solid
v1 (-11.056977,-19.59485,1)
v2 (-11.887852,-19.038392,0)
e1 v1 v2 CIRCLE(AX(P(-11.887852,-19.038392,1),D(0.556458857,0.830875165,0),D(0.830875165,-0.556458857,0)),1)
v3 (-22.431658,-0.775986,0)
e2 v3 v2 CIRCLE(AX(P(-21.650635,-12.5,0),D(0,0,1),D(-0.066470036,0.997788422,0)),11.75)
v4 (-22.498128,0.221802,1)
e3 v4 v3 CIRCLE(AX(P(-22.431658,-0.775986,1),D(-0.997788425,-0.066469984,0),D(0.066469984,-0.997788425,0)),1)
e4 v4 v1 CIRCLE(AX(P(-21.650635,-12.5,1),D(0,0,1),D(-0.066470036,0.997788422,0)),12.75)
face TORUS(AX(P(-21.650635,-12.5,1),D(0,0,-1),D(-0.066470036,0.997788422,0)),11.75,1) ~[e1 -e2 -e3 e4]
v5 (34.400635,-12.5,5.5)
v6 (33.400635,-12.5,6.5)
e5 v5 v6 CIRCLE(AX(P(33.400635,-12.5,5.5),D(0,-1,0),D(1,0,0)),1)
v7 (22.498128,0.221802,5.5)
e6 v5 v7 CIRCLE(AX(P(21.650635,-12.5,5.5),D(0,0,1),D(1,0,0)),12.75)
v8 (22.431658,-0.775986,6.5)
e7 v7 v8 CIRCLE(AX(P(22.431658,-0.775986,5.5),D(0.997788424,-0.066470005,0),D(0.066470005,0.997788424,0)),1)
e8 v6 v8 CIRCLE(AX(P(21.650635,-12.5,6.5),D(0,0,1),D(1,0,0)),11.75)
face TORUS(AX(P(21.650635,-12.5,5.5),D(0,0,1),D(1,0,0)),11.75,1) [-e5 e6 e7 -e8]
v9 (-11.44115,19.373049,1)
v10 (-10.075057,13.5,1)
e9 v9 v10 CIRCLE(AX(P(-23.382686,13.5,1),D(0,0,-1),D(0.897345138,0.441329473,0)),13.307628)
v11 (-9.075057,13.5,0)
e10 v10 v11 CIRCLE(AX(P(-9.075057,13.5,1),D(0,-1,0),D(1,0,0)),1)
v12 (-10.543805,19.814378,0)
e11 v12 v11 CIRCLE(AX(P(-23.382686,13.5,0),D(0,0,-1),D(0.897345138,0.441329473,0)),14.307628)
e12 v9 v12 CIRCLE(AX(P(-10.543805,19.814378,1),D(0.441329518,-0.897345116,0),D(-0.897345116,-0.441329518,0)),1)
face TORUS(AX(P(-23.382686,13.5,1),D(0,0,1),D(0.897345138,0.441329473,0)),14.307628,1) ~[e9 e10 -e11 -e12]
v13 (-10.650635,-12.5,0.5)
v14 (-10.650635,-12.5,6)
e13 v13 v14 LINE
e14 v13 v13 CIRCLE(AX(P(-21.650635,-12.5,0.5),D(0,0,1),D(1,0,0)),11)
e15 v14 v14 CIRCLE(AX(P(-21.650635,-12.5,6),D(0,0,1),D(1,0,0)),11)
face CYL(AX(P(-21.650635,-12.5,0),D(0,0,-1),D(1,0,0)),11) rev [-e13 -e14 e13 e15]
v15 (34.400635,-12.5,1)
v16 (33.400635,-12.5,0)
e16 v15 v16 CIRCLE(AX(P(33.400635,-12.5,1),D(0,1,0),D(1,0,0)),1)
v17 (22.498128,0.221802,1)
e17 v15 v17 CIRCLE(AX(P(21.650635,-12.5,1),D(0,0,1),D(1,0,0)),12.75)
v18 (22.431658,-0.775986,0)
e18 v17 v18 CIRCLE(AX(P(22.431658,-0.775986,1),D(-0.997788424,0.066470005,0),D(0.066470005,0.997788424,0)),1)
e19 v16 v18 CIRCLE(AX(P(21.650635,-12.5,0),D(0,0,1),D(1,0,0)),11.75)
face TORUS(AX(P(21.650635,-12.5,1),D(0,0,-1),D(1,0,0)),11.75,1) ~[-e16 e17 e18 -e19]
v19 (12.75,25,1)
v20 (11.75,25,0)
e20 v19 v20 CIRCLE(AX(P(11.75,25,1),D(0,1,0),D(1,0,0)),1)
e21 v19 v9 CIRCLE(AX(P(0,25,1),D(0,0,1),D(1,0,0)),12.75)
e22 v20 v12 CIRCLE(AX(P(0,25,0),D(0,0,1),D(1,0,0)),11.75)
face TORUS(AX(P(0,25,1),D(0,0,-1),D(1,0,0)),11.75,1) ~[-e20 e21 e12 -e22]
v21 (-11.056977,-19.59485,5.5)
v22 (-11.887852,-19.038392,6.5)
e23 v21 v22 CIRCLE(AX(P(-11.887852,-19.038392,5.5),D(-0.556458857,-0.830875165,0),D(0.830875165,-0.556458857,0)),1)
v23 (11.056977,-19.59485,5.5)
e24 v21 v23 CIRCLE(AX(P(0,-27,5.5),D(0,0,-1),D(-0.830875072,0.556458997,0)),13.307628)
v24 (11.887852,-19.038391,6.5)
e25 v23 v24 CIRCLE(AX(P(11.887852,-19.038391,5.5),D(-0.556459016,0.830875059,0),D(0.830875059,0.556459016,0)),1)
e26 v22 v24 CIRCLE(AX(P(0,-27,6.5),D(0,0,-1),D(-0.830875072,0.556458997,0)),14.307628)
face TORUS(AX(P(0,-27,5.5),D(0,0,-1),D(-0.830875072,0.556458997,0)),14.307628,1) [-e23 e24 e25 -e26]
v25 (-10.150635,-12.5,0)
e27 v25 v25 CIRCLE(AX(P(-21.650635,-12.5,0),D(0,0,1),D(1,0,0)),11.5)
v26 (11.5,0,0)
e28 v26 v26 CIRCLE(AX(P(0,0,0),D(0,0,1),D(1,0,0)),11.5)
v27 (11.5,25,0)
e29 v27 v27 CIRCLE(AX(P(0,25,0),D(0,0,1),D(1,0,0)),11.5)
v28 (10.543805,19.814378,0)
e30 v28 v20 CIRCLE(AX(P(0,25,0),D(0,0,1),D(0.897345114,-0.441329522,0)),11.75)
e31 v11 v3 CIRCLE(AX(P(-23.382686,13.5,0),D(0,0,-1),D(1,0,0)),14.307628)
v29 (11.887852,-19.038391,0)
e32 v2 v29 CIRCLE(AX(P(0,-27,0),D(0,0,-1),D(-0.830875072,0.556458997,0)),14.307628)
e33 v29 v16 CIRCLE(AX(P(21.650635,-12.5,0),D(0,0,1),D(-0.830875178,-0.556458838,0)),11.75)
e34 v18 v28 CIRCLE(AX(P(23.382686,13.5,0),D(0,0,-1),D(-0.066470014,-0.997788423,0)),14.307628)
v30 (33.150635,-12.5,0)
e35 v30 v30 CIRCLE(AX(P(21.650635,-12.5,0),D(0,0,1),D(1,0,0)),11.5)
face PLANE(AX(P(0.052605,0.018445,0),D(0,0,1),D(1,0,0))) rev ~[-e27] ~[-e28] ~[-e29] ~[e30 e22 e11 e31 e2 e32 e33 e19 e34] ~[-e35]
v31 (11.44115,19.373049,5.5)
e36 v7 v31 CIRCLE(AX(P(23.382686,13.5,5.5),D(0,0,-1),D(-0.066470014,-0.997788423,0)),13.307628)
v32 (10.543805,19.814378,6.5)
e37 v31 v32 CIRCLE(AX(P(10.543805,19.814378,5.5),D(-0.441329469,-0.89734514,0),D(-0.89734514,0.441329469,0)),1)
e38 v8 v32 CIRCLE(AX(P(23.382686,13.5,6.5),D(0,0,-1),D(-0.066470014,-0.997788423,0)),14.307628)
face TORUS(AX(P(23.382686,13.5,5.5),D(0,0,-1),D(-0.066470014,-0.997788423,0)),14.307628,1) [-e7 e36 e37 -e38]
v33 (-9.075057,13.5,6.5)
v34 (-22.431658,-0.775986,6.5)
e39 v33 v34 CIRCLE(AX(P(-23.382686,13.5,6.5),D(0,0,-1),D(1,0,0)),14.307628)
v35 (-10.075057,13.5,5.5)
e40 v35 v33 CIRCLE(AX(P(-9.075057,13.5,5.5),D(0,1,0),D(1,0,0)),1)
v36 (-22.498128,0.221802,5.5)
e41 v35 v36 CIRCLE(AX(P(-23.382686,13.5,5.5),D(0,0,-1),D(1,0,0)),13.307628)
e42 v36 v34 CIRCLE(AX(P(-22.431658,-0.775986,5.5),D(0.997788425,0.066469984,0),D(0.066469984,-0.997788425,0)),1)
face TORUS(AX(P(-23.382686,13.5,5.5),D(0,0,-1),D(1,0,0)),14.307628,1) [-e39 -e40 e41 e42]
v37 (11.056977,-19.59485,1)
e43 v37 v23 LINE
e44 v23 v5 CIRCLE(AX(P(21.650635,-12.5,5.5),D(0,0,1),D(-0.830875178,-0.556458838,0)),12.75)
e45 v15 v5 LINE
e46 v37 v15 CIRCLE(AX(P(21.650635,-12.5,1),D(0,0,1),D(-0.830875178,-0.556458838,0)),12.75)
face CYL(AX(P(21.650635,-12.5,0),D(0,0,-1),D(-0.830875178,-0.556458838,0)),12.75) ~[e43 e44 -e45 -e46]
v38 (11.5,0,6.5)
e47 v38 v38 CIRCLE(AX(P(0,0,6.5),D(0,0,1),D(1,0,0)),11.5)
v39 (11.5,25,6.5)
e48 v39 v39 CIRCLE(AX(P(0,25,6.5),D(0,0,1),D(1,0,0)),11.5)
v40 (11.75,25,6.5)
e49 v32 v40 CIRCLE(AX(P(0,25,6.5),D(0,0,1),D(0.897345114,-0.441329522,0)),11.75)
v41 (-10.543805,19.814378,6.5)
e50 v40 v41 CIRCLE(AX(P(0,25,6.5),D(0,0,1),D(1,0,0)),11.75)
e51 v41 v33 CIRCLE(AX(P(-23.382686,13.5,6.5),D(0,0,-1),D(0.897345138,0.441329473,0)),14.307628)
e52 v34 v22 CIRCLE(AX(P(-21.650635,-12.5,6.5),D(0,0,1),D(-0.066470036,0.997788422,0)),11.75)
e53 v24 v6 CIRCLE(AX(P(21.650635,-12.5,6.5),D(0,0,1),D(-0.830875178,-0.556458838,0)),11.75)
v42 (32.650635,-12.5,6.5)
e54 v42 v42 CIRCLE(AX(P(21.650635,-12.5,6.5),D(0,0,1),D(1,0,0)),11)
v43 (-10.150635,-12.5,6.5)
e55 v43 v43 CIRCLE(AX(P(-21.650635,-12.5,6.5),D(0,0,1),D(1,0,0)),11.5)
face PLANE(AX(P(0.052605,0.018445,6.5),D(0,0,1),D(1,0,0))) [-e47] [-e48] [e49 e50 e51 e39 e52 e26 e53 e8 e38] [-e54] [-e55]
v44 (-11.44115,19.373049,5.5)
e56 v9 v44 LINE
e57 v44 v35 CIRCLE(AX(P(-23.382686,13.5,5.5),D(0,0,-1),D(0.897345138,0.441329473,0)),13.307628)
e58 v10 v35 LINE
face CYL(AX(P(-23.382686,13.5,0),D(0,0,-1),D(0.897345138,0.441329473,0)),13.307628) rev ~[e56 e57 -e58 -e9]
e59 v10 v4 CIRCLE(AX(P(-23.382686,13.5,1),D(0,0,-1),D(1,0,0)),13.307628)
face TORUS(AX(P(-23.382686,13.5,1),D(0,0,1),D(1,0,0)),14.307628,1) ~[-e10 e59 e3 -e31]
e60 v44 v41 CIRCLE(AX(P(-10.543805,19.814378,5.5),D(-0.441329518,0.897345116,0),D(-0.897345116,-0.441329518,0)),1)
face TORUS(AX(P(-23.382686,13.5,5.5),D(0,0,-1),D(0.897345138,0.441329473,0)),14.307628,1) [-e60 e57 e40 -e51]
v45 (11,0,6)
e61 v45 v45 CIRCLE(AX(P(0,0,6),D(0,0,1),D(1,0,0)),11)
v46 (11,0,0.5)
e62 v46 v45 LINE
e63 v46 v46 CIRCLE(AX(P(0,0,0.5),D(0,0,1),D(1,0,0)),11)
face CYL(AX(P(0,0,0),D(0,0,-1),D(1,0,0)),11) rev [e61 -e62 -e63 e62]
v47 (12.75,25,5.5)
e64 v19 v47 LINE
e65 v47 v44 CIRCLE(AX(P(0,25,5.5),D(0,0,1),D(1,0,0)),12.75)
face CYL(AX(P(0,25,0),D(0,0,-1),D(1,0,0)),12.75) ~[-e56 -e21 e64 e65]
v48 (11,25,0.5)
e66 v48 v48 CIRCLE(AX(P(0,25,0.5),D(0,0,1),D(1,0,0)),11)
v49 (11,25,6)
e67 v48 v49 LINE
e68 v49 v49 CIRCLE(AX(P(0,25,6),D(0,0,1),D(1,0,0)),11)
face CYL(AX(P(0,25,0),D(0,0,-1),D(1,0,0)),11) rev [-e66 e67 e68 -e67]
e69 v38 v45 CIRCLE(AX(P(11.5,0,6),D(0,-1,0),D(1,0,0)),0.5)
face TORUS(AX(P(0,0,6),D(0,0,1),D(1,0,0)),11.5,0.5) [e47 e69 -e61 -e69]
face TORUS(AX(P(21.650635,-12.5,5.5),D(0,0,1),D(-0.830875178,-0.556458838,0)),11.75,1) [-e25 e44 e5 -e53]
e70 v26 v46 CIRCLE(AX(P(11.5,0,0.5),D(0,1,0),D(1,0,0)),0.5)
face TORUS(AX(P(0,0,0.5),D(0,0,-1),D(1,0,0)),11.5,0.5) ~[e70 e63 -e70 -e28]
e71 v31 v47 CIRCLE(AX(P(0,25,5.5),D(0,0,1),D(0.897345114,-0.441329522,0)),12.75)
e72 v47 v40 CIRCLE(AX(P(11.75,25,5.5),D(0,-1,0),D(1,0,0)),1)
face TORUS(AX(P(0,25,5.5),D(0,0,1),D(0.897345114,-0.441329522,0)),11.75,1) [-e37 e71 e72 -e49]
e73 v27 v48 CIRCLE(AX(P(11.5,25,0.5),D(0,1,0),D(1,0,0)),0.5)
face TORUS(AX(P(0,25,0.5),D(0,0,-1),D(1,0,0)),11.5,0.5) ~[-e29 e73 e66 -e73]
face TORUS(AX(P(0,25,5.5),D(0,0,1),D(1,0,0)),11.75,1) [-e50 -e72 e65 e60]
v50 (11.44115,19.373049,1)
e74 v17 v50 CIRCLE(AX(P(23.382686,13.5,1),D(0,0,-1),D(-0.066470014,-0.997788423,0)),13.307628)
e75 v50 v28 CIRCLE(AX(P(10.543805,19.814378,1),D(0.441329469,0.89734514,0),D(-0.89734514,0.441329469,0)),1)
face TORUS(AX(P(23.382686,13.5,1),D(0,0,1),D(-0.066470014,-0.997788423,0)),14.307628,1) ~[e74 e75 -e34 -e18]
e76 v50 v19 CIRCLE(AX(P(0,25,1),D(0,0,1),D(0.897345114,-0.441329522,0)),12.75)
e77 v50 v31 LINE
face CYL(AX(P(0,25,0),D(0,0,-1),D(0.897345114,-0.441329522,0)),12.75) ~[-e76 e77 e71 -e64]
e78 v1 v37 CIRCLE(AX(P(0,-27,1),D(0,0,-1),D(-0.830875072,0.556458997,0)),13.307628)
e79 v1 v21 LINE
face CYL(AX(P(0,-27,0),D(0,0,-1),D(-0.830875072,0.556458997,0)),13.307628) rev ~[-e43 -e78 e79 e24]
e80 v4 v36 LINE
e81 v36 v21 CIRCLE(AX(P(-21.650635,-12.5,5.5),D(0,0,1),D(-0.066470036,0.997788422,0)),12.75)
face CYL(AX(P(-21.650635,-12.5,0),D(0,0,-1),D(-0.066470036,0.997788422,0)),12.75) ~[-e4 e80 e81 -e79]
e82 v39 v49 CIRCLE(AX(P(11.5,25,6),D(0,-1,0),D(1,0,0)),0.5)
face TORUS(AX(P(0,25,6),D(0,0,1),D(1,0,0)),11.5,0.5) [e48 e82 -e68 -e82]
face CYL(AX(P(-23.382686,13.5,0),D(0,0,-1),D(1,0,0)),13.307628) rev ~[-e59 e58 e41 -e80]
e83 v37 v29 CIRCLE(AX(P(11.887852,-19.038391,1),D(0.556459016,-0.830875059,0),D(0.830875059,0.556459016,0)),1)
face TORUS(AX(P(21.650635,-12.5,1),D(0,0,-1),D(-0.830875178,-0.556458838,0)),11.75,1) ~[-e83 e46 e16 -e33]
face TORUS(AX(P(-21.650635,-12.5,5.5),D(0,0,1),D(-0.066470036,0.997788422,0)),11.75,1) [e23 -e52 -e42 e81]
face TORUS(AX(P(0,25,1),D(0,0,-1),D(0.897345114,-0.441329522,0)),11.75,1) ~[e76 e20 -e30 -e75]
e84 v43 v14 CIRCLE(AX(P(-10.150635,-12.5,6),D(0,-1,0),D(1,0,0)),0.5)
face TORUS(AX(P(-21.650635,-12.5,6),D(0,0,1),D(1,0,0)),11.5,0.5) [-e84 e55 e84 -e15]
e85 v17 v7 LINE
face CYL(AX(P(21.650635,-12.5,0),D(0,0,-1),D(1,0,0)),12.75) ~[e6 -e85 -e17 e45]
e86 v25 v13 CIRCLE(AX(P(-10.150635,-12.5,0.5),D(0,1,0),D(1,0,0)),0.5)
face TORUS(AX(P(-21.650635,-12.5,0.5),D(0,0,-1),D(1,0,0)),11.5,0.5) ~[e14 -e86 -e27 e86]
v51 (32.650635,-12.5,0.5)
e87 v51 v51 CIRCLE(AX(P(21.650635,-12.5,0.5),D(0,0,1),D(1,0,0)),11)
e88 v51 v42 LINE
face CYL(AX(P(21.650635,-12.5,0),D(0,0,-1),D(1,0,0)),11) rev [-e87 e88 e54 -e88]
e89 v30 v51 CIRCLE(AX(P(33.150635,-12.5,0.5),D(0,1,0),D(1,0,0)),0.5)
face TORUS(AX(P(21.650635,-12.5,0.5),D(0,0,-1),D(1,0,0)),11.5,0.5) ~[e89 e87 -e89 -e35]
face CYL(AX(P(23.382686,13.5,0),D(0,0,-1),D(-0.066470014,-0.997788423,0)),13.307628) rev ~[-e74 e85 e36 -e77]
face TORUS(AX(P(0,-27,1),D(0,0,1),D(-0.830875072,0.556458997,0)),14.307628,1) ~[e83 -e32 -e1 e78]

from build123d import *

# Parameters (mm, degrees)
F0_R     = 11
F1_DEPTH = 6.5
F2_R     = 1
F3_R     = 0.5


with BuildPart() as f1:
    # F0 (on Top) → F1 (new body)
    with BuildSketch(Plane.XY):
        with BuildLine():
            ThreePointArc((12.0815519999, -4.0741381018), (12.5817782527, -2.0643052101), (12.75, 0))
            ThreePointArc((12.75, 0), (9.8639869866, 8.0786298794), (2.5124689053, 12.5))
            ThreePointArc((2.5124689053, 12.5), (0, 12.25), (-2.5124689053, 12.5))
            ThreePointArc((-2.5124689053, 12.5), (-11.0418238983, 6.375), (-12.0815519999, -4.0741381018))
            ThreePointArc((-12.0815519999, -4.0741381018), (-10.6088111964, -6.125), (-9.5690830947, -8.4258618982))
            ThreePointArc((-9.5690830947, -8.4258618982), (0, -12.75), (9.5690830947, -8.4258618982))
            ThreePointArc((9.5690830947, -8.4258618982), (10.6088111964, -6.125), (12.0815519999, -4.0741381018))
        make_face()
        Circle(F0_R, mode=Mode.SUBTRACT)
        with BuildLine():
            ThreePointArc((2.5124689053, 12.5), (9.8639869866, 8.0786298794), (12.75, 0))
            ThreePointArc((12.75, 0), (12.5817782527, -2.0643052101), (12.0815519999, -4.0741381018))
            ThreePointArc((12.0815519999, -4.0741381018), (16.7895332065, -0.7130500793), (22.4981276547, 0.2218024022))
            ThreePointArc((22.4981276547, 0.2218024022), (11.8579416889, 6.8461856384), (11.4411501987, 19.3730485936))
            ThreePointArc((11.4411501987, 19.3730485936), (7.7772469915, 14.896687215), (2.5124689053, 12.5))
        make_face()
        with BuildLine():
            ThreePointArc((-2.5124689053, 12.5), (0, 12.25), (2.5124689053, 12.5))
            ThreePointArc((2.5124689053, 12.5), (0, 12.75), (-2.5124689053, 12.5))
        make_face()
        with BuildLine():
            ThreePointArc((-2.5124689053, 12.5), (0, 12.75), (2.5124689053, 12.5))
            ThreePointArc((2.5124689053, 12.5), (7.7772469915, 14.896687215), (11.4411501987, 19.3730485936))
            ThreePointArc((11.4411501987, 19.3730485936), (12.4184774637, 22.1114160073), (12.75, 25))
            ThreePointArc((12.75, 25), (-2.8885839653, 37.4184774701), (-11.4411502236, 19.3730486441))
            ThreePointArc((-11.4411502236, 19.3730486441), (-7.7772470139, 14.8966872321), (-2.5124689053, 12.5))
        make_face()
        with Locations((0, 25)):
            Circle(F0_R, mode=Mode.SUBTRACT)
        with BuildLine():
            ThreePointArc((22.4981276547, 0.2218024022), (16.7895332065, -0.7130500793), (12.0815519999, -4.0741381018))
            ThreePointArc((12.0815519999, -4.0741381018), (11.0418238983, -6.375), (9.5690830947, -8.4258618982))
            ThreePointArc((9.5690830947, -8.4258618982), (9.0122859979, -14.1836365732), (11.0569765695, -19.5948501784))
            ThreePointArc((11.0569765695, -19.5948501784), (25.3582862247, -24.6990091031), (34.4006350946, -12.5))
            ThreePointArc((34.4006350946, -12.5), (30.9610601692, -3.7891742682), (22.4981276547, 0.2218024022))
        make_face()
        with Locations((21.6506350946, -12.5)):
            Circle(F0_R, mode=Mode.SUBTRACT)
        with BuildLine():
            ThreePointArc((9.5690830947, -8.4258618982), (11.0418238983, -6.375), (12.0815519999, -4.0741381018))
            ThreePointArc((12.0815519999, -4.0741381018), (10.6088111964, -6.125), (9.5690830947, -8.4258618982))
        make_face()
        with BuildLine():
            ThreePointArc((-12.0815519999, -4.0741381018), (-11.0418238983, 6.375), (-2.5124689053, 12.5))
            ThreePointArc((-2.5124689053, 12.5), (-7.7772470139, 14.8966872321), (-11.4411502236, 19.3730486441))
            ThreePointArc((-11.4411502236, 19.3730486441), (-10.4210792392, 16.514917487), (-10.0750574606, 13.5))
            ThreePointArc((-10.0750574606, 13.5), (-13.6650642316, 4.4082012887), (-22.498128058, 0.2218023753))
            ThreePointArc((-22.498128058, 0.2218023753), (-16.7895333933, -0.7130500022), (-12.0815519999, -4.0741381018))
        make_face()
        with BuildLine():
            ThreePointArc((11.0569765695, -19.5948501784), (9.0122859979, -14.1836365732), (9.5690830947, -8.4258618982))
            ThreePointArc((9.5690830947, -8.4258618982), (0, -12.75), (-9.5690830947, -8.4258618982))
            ThreePointArc((-9.5690830947, -8.4258618982), (-9.0688568419, -10.4356947899), (-8.9006350946, -12.5))
            ThreePointArc((-8.9006350946, -12.5), (-9.4516260346, -16.207651272), (-11.0569767345, -19.5948504248))
            ThreePointArc((-11.0569767345, -19.5948504248), (-1.483e-07, -13.6923715584), (11.0569765695, -19.5948501784))
        make_face()
        with BuildLine():
            ThreePointArc((-9.5690830947, -8.4258618982), (-10.6088111964, -6.125), (-12.0815519999, -4.0741381018))
            ThreePointArc((-12.0815519999, -4.0741381018), (-11.0418238983, -6.375), (-9.5690830947, -8.4258618982))
        make_face()
        with BuildLine():
            ThreePointArc((-9.5690830947, -8.4258618982), (-11.0418238983, -6.375), (-12.0815519999, -4.0741381018))
            ThreePointArc((-12.0815519999, -4.0741381018), (-16.7895333933, -0.7130500022), (-22.498128058, 0.2218023753))
            ThreePointArc((-22.498128058, 0.2218023753), (-32.6924586322, -18.8750006247), (-11.0569767345, -19.5948504248))
            ThreePointArc((-11.0569767345, -19.5948504248), (-9.4516260346, -16.207651272), (-8.9006350946, -12.5))
            ThreePointArc((-8.9006350946, -12.5), (-9.0688568419, -10.4356947899), (-9.5690830947, -8.4258618982))
        make_face()
        with Locations((-21.6506350946, -12.5)):
            Circle(F0_R, mode=Mode.SUBTRACT)
    extrude(amount=F1_DEPTH)

    # F2
    f2_edges = [f1.edges().sort_by_distance(p)[0] for p in [
        (0, 37.75, 6.5),
        (0, 37.75, 0),
        (32.692459, -18.875001, 0),
        (32.692459, -18.875001, 6.5),
        (11.857942, 6.846186, 0),
        (11.857942, 6.846186, 6.5),
        (-11.857942, 6.846185, 0),
        (-11.857942, 6.846185, 6.5),
        (-32.692459, -18.875001, 0),
        (-32.692459, -18.875001, 6.5),
        (0, -13.692372, 0),
        (0, -13.692372, 6.5),
    ]]
    fillet(f2_edges, radius=F2_R)

    # F3
    f3_edges = [f1.edges().sort_by_distance(p)[0] for p in [
        (-11, 25, 6.5),
        (-11, 0, 6.5),
        (-32.650635, -12.5, 6.5),
        (-11, 25, 0),
        (-11, 0, 0),
        (-32.650635, -12.5, 0),
        (10.650635, -12.5, 0),
    ]]
    fillet(f3_edges, radius=F3_R)


solid = f1.part
